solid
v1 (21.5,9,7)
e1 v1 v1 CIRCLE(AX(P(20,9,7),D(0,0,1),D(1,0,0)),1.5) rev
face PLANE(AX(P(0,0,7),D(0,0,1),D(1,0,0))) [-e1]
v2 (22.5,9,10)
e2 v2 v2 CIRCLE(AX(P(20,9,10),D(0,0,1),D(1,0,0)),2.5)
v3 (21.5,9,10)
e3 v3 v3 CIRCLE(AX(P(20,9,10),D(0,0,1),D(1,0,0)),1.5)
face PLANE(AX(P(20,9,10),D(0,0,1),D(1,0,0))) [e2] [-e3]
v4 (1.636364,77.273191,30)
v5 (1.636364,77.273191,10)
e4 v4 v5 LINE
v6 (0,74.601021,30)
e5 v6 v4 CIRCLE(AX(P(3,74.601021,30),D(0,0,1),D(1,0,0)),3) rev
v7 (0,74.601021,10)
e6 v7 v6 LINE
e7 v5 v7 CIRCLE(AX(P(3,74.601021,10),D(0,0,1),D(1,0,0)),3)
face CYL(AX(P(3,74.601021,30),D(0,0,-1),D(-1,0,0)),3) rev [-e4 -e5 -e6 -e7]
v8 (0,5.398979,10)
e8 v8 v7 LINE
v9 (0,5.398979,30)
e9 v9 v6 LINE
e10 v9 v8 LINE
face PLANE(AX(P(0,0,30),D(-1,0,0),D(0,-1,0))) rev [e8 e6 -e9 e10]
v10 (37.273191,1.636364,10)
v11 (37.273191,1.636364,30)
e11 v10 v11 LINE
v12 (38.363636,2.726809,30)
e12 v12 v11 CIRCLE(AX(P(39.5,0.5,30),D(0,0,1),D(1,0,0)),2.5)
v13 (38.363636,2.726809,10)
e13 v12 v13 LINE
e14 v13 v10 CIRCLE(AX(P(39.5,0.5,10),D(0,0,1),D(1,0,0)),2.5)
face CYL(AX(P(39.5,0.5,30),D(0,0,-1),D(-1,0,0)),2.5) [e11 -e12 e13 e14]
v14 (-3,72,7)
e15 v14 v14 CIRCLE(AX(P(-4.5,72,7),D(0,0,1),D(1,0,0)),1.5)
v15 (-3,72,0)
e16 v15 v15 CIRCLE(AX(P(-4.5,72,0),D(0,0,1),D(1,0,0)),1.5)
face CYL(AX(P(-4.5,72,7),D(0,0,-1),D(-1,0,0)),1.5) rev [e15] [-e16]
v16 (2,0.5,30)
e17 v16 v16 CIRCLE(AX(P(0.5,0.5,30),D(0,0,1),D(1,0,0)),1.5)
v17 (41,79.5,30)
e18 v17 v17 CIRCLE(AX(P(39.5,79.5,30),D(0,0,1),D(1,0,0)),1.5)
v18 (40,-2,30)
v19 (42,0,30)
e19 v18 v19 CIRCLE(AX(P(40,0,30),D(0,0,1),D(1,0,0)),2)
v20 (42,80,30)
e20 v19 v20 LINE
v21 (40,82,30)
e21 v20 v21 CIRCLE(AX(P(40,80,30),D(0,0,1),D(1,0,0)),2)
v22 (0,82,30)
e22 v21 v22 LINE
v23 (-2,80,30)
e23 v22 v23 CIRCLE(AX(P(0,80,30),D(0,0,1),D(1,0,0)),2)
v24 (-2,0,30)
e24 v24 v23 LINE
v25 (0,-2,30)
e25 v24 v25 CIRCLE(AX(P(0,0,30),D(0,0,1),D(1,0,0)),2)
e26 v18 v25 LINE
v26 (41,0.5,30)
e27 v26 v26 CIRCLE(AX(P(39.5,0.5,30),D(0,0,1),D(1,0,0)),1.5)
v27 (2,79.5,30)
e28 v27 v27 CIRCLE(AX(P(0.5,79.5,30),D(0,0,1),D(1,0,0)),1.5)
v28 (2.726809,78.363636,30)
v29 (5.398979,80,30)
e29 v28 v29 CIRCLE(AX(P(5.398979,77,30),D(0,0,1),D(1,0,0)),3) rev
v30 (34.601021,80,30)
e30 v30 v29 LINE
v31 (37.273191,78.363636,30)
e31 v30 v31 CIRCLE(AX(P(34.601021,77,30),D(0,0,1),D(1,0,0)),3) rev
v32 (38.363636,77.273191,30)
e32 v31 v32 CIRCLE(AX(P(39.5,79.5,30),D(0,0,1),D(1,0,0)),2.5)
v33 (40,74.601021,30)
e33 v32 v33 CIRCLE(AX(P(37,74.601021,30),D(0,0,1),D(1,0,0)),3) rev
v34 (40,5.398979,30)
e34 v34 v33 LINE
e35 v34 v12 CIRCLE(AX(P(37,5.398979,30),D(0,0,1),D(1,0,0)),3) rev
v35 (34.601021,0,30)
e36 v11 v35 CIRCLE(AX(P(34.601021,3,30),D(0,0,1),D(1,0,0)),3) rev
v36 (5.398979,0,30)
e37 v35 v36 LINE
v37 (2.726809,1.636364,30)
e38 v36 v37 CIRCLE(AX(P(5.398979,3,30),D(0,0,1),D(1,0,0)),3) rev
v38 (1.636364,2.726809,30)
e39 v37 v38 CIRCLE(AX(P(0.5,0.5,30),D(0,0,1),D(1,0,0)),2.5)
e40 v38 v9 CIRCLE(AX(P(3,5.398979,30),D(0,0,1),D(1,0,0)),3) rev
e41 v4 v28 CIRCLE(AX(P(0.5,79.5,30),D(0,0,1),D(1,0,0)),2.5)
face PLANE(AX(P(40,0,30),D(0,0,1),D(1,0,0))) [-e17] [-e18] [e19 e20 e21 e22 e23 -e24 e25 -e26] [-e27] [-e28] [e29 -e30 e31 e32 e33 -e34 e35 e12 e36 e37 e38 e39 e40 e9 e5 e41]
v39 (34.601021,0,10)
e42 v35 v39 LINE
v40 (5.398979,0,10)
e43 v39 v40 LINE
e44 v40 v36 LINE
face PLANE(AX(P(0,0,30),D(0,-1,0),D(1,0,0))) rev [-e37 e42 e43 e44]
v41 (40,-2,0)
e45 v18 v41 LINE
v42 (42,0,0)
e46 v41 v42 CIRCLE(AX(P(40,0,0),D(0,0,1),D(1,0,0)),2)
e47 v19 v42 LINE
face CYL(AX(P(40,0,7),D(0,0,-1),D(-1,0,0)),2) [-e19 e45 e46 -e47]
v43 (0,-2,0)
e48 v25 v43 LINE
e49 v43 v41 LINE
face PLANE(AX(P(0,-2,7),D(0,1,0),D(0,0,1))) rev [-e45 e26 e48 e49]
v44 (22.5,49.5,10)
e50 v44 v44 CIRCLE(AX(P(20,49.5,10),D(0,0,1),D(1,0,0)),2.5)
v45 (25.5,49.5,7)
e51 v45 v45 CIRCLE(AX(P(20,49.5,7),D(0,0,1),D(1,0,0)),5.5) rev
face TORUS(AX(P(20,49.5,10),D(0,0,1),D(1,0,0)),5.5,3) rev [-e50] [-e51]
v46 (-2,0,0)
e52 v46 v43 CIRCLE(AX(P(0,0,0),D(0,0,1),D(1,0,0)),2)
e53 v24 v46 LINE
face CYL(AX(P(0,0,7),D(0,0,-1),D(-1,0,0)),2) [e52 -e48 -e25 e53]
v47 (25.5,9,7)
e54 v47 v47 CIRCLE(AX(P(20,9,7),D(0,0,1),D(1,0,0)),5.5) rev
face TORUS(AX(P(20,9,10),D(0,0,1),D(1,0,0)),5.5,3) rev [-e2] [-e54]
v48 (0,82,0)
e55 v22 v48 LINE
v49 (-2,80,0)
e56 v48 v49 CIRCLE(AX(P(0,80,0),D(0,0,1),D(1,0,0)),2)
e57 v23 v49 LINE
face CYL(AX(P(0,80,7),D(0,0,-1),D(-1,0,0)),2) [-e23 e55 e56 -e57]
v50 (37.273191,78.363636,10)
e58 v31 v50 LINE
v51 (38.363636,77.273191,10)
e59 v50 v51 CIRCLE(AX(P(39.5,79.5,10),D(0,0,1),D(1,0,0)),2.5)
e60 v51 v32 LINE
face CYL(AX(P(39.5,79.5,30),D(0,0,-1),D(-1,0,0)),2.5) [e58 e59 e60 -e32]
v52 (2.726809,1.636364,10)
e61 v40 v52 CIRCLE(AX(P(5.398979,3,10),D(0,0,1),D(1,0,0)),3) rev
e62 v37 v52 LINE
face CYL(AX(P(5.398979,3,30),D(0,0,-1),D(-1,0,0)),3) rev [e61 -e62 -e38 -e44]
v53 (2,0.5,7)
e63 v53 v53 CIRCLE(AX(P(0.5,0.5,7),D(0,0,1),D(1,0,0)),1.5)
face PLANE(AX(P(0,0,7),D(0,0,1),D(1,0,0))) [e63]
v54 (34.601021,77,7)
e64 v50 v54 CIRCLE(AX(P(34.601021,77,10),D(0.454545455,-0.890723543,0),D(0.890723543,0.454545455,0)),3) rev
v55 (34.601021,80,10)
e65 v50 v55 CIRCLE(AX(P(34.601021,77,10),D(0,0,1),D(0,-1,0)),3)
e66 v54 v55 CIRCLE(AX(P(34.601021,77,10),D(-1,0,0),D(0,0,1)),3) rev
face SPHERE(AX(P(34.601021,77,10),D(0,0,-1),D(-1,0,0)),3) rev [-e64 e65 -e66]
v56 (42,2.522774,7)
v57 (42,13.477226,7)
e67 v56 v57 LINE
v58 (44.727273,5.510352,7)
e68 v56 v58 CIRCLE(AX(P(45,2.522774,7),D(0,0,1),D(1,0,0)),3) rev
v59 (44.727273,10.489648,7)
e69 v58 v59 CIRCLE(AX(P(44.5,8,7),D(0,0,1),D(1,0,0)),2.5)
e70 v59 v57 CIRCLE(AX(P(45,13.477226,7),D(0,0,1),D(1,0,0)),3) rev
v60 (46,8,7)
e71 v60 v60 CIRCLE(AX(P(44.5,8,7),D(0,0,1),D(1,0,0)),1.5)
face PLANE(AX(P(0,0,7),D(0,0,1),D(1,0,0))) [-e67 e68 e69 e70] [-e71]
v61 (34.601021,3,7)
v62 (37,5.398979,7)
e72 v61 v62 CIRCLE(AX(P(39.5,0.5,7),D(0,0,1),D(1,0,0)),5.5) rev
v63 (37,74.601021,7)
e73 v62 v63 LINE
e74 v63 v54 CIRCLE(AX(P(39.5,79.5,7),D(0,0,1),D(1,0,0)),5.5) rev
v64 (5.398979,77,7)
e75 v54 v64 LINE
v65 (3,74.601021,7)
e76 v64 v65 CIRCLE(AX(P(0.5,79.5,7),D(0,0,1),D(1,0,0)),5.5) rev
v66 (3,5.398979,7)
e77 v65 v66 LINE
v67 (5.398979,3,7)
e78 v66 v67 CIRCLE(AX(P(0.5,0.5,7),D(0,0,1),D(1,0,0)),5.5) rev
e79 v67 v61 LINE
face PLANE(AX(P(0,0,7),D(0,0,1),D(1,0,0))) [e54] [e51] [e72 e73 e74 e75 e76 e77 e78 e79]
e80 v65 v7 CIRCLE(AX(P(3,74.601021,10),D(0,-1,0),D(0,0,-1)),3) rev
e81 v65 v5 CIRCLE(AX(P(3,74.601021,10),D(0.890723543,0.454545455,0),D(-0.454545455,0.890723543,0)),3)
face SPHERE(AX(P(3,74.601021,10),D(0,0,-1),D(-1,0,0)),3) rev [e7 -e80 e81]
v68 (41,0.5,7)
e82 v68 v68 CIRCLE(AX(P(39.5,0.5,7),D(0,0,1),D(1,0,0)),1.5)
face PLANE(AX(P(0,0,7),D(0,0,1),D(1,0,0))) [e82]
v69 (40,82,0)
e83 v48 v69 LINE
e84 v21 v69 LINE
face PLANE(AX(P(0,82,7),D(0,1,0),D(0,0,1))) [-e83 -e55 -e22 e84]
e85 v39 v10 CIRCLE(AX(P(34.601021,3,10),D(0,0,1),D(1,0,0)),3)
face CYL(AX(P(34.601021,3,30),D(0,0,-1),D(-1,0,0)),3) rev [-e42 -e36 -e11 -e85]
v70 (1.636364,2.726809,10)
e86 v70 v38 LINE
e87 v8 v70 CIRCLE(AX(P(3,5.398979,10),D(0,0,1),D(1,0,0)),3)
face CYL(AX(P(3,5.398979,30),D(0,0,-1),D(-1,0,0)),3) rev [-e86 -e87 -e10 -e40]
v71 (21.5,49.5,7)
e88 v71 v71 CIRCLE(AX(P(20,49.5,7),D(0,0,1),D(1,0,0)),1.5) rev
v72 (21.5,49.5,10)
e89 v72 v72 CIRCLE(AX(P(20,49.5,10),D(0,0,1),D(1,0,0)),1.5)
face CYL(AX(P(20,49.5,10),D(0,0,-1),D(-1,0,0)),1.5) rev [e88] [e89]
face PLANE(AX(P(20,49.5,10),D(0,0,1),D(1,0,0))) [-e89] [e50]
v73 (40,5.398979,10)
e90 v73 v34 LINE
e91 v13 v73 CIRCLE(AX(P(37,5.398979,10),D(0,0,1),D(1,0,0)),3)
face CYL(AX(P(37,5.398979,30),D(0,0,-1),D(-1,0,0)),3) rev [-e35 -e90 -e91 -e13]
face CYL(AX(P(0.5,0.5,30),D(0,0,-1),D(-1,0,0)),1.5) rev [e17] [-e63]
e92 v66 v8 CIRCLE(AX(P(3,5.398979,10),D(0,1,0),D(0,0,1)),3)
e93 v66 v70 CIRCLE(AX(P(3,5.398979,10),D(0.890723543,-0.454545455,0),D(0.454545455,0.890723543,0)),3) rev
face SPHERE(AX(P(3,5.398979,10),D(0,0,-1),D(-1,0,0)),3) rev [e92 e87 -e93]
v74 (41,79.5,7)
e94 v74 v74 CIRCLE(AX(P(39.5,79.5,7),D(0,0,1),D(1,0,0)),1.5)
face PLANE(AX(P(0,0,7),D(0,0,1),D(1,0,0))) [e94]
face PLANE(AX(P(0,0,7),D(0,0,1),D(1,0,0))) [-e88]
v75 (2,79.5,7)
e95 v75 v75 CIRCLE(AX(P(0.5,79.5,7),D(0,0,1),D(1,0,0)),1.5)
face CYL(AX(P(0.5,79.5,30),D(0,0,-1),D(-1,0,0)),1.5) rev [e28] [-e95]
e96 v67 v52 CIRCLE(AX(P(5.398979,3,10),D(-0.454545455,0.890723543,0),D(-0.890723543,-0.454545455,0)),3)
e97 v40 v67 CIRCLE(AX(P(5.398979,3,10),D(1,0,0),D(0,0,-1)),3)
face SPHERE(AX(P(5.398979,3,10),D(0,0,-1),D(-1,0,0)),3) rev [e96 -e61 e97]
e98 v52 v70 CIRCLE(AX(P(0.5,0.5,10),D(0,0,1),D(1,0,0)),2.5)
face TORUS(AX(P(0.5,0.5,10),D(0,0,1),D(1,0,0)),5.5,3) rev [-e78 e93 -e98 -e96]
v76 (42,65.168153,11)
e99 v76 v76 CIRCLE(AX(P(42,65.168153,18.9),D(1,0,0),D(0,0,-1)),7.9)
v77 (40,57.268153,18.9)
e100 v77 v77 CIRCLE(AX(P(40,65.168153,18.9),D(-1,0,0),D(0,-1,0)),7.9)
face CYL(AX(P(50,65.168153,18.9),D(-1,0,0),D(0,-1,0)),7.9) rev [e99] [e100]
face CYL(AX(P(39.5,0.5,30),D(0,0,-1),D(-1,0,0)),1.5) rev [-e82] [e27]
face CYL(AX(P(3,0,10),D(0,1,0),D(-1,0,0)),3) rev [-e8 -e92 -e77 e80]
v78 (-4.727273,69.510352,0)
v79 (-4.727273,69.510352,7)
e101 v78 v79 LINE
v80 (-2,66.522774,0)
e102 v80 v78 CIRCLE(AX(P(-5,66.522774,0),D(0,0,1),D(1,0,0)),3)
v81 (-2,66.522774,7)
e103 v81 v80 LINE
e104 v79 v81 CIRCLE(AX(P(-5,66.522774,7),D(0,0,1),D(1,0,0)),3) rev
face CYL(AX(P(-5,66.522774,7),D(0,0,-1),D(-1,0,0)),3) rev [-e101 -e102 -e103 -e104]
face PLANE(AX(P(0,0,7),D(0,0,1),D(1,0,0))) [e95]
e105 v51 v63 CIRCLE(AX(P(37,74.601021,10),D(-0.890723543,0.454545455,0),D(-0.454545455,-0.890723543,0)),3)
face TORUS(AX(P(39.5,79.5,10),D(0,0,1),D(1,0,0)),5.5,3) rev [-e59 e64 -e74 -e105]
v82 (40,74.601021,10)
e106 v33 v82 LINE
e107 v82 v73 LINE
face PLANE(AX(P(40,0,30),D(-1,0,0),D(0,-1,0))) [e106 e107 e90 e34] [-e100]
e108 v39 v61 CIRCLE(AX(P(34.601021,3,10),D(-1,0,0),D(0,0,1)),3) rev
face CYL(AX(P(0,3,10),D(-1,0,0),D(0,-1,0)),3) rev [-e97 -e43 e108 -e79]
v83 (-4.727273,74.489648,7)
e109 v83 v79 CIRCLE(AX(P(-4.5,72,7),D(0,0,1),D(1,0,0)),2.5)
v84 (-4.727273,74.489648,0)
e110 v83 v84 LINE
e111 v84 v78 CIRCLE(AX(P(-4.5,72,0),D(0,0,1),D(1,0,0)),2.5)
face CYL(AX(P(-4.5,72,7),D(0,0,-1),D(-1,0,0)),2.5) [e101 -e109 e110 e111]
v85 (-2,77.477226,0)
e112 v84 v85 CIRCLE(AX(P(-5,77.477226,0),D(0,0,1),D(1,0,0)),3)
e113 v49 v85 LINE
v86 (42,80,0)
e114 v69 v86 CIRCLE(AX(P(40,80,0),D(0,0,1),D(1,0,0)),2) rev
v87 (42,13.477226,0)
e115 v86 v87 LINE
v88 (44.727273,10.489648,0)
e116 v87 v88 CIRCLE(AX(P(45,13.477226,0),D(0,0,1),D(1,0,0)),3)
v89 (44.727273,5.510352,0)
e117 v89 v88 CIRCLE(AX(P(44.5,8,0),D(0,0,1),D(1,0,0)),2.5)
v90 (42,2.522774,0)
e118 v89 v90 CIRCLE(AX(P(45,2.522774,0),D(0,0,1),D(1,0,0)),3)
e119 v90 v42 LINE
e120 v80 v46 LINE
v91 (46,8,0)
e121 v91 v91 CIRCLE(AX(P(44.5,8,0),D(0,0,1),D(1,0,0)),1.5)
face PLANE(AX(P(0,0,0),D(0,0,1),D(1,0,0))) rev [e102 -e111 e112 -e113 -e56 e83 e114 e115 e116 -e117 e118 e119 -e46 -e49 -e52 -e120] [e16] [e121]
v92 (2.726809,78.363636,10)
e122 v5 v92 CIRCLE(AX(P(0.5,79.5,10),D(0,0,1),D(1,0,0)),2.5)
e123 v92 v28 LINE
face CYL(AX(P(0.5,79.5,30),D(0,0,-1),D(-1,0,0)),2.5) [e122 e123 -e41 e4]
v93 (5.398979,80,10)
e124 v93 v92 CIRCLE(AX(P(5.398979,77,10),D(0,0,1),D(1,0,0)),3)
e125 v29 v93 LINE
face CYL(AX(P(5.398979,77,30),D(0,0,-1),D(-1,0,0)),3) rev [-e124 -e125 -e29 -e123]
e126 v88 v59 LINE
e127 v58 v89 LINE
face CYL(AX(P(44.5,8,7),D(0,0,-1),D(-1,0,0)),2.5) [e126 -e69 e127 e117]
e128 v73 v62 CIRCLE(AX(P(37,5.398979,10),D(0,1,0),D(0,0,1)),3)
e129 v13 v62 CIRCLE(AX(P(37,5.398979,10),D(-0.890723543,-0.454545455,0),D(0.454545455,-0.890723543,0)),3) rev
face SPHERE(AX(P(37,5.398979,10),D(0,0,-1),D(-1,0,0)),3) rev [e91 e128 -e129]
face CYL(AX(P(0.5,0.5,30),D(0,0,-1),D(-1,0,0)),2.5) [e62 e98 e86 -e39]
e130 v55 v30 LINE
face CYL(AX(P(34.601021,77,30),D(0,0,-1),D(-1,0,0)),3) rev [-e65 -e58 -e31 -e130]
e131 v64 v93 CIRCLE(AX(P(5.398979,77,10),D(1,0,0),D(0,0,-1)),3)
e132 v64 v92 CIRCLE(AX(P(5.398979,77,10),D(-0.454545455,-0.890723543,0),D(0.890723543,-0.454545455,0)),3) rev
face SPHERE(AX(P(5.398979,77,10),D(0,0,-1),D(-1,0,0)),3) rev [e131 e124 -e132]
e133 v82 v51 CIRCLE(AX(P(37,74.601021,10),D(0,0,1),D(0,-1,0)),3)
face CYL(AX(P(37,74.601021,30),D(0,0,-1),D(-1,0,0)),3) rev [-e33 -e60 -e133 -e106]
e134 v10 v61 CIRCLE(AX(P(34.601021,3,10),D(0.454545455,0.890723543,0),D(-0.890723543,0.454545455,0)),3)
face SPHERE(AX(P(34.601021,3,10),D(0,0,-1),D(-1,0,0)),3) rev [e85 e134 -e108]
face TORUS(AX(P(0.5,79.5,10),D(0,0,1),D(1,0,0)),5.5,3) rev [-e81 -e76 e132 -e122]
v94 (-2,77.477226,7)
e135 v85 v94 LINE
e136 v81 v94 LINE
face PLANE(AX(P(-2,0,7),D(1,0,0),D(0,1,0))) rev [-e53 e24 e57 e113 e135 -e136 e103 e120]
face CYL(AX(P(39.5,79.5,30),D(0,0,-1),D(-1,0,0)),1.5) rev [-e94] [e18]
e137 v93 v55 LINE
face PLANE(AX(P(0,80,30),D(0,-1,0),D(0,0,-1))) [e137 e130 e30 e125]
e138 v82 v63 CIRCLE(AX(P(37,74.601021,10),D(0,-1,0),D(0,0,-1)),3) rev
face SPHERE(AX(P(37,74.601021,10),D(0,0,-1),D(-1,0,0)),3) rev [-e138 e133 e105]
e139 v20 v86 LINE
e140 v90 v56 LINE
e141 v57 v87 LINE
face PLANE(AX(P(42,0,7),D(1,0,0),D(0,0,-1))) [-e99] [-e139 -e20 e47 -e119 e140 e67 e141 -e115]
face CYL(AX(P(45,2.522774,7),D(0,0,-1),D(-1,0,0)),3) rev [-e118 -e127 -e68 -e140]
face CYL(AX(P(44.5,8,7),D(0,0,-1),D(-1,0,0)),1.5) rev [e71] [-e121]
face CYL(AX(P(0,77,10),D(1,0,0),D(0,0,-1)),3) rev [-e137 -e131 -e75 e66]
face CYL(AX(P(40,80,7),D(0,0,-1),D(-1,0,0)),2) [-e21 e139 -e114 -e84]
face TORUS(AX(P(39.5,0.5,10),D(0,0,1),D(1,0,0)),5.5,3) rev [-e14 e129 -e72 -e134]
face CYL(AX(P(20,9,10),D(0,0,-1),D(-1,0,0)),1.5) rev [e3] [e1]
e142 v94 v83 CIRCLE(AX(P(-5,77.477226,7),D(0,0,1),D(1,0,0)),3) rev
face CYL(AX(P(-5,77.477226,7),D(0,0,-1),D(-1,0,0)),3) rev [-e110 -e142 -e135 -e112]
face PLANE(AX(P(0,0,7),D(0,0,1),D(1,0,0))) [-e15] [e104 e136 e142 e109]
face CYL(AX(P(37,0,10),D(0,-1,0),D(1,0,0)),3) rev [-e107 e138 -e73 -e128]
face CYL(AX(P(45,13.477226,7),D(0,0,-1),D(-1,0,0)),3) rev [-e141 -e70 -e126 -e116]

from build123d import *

# Parameters (mm, degrees)
SKETCH3_R          = 1.5
BASE_DEPTH         = 7
WALLS_START        = 7
SKETCH3_3_R        = 1.5
WALLS_DEPTH        = 23
STANDOFFS_START    = 7
SKETCH3_4_R        = 2.5
SKETCH3_4_R_2      = 1.5
STANDOFFS_DEPTH    = 3
INTERNAL_FILLET_R  = 3
EXTERNAL_FILLET_R  = 3
SKETCH5_R          = 7.9
CUT_EXTRUDE1_DEPTH = 10


# Some blends are built 0.0001 mm under size
with BuildPart() as part:
    # Sketch3 → base (new body)
    with BuildSketch(Plane.XY):
        with BuildLine():
            ThreePointArc((-4.5, 74.5), (-7, 72), (-4.5, 69.5))
            Line((-4.5, 69.5), (-2, 69.5))
            Line((-2, 69.5), (-2, 0))
            ThreePointArc((-2, 0), (-1.414213562, -1.414213562), (0, -2))
            Line((0, -2), (40, -2))
            ThreePointArc((40, -2), (41.414213562, -1.414213562), (42, 0))
            Line((42, 0), (42, 5.5))
            Line((42, 5.5), (44.5, 5.5))
            ThreePointArc((44.5, 5.5), (47, 8), (44.5, 10.5))
            Line((44.5, 10.5), (42, 10.5))
            Line((42, 10.5), (42, 80))
            ThreePointArc((42, 80), (41.414213562, 81.414213562), (40, 82))
            Line((40, 82), (0, 82))
            ThreePointArc((0, 82), (-1.414213562, 81.414213562), (-2, 80))
            Line((-2, 80), (-2, 74.5))
            Line((-2, 74.5), (-4.5, 74.5))
        make_face()
        with Locations((44.5, 8)):
            Circle(SKETCH3_R, mode=Mode.SUBTRACT)
        with Locations((-4.5, 72)):
            Circle(SKETCH3_R, mode=Mode.SUBTRACT)
    extrude(amount=BASE_DEPTH)

    # Sketch3<3> → walls (add)
    with BuildSketch(Plane.XY.offset(WALLS_START)):
        with BuildLine():
            Line((-2, 74.5), (-2, 69.5))
            Line((-2, 69.5), (-2, 0))
            ThreePointArc((-2, 0), (-1.414213562, -1.414213562), (0, -2))
            Line((0, -2), (40, -2))
            ThreePointArc((40, -2), (41.414213562, -1.414213562), (42, 0))
            Line((42, 0), (42, 5.5))
            Line((42, 5.5), (42, 10.5))
            Line((42, 10.5), (42, 80))
            ThreePointArc((42, 80), (41.414213562, 81.414213562), (40, 82))
            Line((40, 82), (0, 82))
            ThreePointArc((0, 82), (-1.414213562, 81.414213562), (-2, 80))
            Line((-2, 80), (-2, 74.5))
        make_face()
        with BuildLine():
            ThreePointArc((0.00181331, 1.914853357), (1.366810234, 1.724189535), (2, 0.5))
            ThreePointArc((2, 0.5), (1.978560116, 0.247294673), (1.914853357, 0.00181331))
            ThreePointArc((1.914853357, 0.00181331), (-0.560660172, -0.560660172), (0.00181331, 1.914853357))
        make_face(mode=Mode.SUBTRACT)
        with Locations((39.5, 0.5)):
            Circle(SKETCH3_3_R, mode=Mode.SUBTRACT)
        with Locations((0.5, 79.5)):
            Circle(SKETCH3_3_R, mode=Mode.SUBTRACT)
        with BuildLine():
            ThreePointArc((0, 77.050510257), (2.267766953, 77.732233047), (2.949489743, 80))
            Line((2.949489743, 80), (37.050510257, 80))
            ThreePointArc((37.050510257, 80), (37.732233047, 77.732233047), (40, 77.050510257))
            Line((40, 77.050510257), (40, 2.949489743))
            ThreePointArc((40, 2.949489743), (37.732233047, 2.267766953), (37.050510257, 0))
            Line((37.050510257, 0), (2.949489743, 0))
            ThreePointArc((2.949489743, 0), (2.267766953, 2.267766953), (0, 2.949489743))
            Line((0, 2.949489743), (0, 77.050510257))
        make_face(mode=Mode.SUBTRACT)
        with Locations((39.5, 79.5)):
            Circle(SKETCH3_3_R, mode=Mode.SUBTRACT)
    extrude(amount=WALLS_DEPTH)

    # Sketch3<4> → standoffs (add)
    # profile 1 of 2: a face of its own
    with BuildSketch(Plane.XY.offset(STANDOFFS_START)):
        with Locations((20, 49.5)):
            Circle(SKETCH3_4_R)
        with Locations((20, 49.5)):
            Circle(SKETCH3_4_R_2, mode=Mode.SUBTRACT)
    # profile 2 of 2: a face of its own
    with BuildSketch(Plane.XY.offset(STANDOFFS_START)):
        with Locations((20, 9)):
            Circle(SKETCH3_4_R)
        with Locations((20, 9)):
            Circle(SKETCH3_4_R_2, mode=Mode.SUBTRACT)
    extrude(amount=STANDOFFS_DEPTH)

    # Internal Fillet
    internal_fillet_edges = [part.edges().sort_by_distance(p)[0] for p in [
        (17.5, 49.5, 7),
        (17.5, 9, 7),
        (40, 40, 7),
        (20, 80, 7),
        (0, 40, 7),
        (0, 2.949489743, 18.5),
        (2.267766953, 2.267766953, 7),
        (2.949489743, 0, 18.5),
        (20, 0, 7),
        (37.050510257, 0, 18.5),
        (37.732233047, 2.267766953, 7),
        (40, 2.949489743, 18.5),
        (40, 77.050510257, 18.5),
        (37.732233047, 77.732233047, 7),
        (37.050510257, 80, 18.5),
        (2.949489743, 80, 18.5),
        (2.267766953, 77.732233047, 7),
        (0, 77.050510257, 18.5),
    ]]
    fillet(internal_fillet_edges, radius=INTERNAL_FILLET_R - 0.0001)  # a hair under: the kernel refuses the full size

    # External Fillet
    # the kernel refuses this fillet: 3 mm, written as the material it adds along each edge
    with BuildSketch(Plane(origin=(42, 5.5, 0), x_dir=(0, -1, 0), z_dir=(0, 0, 1)), Plane(origin=(-2, 74.5, 0), x_dir=(0, 1, 0), z_dir=(0, 0, 1))) as external_fillet_piece_1:
        with BuildLine():
            CenterArc((2.977225575, 3), EXTERNAL_FILLET_R, 185.21590857, 84.78409143)
            Line((-0.010352011, 2.727272727), (-0.30910977, 2.7))
            ThreePointArc((-0.30910977, 2.7), (-0.3, 2.5), (-0.3, 0))
            Line((-0.3, 0), (0, -0.3))
            Line((0, -0.3), (2.977225575, -0.3))
            Line((2.977225575, -0.3), (2.977225575, 0))
        make_face()
    extrude(amount=7)
    with BuildSketch(Plane(origin=(42, 10.5, 0), x_dir=(0, 1, 0), z_dir=(0, 0, 1)), Plane(origin=(-2, 69.5, 0), x_dir=(0, -1, 0), z_dir=(0, 0, 1))) as external_fillet_piece_2:
        with BuildLine():
            CenterArc((2.977225575, -3), EXTERNAL_FILLET_R, 90, 84.78409143)
            Line((-0.010352011, -2.727272727), (-0.30910977, -2.7))
            ThreePointArc((-0.30910977, -2.7), (-0.3, -2.5), (-0.3, 0))
            Line((-0.3, 0), (0, 0.3))
            Line((0, 0.3), (2.977225575, 0.3))
            Line((2.977225575, 0.3), (2.977225575, 0))
        make_face()
    extrude(amount=7)

    # Sketch5 → Cut-Extrude1 (cut)
    with BuildSketch(Plane.ZY.offset(-40)):
        with Locations(Location((18.9, 65.168153045, 0), (0, 0, 270))):
            Circle(SKETCH5_R)
    extrude(amount=-CUT_EXTRUDE1_DEPTH, mode=Mode.SUBTRACT)


solid = part.part
